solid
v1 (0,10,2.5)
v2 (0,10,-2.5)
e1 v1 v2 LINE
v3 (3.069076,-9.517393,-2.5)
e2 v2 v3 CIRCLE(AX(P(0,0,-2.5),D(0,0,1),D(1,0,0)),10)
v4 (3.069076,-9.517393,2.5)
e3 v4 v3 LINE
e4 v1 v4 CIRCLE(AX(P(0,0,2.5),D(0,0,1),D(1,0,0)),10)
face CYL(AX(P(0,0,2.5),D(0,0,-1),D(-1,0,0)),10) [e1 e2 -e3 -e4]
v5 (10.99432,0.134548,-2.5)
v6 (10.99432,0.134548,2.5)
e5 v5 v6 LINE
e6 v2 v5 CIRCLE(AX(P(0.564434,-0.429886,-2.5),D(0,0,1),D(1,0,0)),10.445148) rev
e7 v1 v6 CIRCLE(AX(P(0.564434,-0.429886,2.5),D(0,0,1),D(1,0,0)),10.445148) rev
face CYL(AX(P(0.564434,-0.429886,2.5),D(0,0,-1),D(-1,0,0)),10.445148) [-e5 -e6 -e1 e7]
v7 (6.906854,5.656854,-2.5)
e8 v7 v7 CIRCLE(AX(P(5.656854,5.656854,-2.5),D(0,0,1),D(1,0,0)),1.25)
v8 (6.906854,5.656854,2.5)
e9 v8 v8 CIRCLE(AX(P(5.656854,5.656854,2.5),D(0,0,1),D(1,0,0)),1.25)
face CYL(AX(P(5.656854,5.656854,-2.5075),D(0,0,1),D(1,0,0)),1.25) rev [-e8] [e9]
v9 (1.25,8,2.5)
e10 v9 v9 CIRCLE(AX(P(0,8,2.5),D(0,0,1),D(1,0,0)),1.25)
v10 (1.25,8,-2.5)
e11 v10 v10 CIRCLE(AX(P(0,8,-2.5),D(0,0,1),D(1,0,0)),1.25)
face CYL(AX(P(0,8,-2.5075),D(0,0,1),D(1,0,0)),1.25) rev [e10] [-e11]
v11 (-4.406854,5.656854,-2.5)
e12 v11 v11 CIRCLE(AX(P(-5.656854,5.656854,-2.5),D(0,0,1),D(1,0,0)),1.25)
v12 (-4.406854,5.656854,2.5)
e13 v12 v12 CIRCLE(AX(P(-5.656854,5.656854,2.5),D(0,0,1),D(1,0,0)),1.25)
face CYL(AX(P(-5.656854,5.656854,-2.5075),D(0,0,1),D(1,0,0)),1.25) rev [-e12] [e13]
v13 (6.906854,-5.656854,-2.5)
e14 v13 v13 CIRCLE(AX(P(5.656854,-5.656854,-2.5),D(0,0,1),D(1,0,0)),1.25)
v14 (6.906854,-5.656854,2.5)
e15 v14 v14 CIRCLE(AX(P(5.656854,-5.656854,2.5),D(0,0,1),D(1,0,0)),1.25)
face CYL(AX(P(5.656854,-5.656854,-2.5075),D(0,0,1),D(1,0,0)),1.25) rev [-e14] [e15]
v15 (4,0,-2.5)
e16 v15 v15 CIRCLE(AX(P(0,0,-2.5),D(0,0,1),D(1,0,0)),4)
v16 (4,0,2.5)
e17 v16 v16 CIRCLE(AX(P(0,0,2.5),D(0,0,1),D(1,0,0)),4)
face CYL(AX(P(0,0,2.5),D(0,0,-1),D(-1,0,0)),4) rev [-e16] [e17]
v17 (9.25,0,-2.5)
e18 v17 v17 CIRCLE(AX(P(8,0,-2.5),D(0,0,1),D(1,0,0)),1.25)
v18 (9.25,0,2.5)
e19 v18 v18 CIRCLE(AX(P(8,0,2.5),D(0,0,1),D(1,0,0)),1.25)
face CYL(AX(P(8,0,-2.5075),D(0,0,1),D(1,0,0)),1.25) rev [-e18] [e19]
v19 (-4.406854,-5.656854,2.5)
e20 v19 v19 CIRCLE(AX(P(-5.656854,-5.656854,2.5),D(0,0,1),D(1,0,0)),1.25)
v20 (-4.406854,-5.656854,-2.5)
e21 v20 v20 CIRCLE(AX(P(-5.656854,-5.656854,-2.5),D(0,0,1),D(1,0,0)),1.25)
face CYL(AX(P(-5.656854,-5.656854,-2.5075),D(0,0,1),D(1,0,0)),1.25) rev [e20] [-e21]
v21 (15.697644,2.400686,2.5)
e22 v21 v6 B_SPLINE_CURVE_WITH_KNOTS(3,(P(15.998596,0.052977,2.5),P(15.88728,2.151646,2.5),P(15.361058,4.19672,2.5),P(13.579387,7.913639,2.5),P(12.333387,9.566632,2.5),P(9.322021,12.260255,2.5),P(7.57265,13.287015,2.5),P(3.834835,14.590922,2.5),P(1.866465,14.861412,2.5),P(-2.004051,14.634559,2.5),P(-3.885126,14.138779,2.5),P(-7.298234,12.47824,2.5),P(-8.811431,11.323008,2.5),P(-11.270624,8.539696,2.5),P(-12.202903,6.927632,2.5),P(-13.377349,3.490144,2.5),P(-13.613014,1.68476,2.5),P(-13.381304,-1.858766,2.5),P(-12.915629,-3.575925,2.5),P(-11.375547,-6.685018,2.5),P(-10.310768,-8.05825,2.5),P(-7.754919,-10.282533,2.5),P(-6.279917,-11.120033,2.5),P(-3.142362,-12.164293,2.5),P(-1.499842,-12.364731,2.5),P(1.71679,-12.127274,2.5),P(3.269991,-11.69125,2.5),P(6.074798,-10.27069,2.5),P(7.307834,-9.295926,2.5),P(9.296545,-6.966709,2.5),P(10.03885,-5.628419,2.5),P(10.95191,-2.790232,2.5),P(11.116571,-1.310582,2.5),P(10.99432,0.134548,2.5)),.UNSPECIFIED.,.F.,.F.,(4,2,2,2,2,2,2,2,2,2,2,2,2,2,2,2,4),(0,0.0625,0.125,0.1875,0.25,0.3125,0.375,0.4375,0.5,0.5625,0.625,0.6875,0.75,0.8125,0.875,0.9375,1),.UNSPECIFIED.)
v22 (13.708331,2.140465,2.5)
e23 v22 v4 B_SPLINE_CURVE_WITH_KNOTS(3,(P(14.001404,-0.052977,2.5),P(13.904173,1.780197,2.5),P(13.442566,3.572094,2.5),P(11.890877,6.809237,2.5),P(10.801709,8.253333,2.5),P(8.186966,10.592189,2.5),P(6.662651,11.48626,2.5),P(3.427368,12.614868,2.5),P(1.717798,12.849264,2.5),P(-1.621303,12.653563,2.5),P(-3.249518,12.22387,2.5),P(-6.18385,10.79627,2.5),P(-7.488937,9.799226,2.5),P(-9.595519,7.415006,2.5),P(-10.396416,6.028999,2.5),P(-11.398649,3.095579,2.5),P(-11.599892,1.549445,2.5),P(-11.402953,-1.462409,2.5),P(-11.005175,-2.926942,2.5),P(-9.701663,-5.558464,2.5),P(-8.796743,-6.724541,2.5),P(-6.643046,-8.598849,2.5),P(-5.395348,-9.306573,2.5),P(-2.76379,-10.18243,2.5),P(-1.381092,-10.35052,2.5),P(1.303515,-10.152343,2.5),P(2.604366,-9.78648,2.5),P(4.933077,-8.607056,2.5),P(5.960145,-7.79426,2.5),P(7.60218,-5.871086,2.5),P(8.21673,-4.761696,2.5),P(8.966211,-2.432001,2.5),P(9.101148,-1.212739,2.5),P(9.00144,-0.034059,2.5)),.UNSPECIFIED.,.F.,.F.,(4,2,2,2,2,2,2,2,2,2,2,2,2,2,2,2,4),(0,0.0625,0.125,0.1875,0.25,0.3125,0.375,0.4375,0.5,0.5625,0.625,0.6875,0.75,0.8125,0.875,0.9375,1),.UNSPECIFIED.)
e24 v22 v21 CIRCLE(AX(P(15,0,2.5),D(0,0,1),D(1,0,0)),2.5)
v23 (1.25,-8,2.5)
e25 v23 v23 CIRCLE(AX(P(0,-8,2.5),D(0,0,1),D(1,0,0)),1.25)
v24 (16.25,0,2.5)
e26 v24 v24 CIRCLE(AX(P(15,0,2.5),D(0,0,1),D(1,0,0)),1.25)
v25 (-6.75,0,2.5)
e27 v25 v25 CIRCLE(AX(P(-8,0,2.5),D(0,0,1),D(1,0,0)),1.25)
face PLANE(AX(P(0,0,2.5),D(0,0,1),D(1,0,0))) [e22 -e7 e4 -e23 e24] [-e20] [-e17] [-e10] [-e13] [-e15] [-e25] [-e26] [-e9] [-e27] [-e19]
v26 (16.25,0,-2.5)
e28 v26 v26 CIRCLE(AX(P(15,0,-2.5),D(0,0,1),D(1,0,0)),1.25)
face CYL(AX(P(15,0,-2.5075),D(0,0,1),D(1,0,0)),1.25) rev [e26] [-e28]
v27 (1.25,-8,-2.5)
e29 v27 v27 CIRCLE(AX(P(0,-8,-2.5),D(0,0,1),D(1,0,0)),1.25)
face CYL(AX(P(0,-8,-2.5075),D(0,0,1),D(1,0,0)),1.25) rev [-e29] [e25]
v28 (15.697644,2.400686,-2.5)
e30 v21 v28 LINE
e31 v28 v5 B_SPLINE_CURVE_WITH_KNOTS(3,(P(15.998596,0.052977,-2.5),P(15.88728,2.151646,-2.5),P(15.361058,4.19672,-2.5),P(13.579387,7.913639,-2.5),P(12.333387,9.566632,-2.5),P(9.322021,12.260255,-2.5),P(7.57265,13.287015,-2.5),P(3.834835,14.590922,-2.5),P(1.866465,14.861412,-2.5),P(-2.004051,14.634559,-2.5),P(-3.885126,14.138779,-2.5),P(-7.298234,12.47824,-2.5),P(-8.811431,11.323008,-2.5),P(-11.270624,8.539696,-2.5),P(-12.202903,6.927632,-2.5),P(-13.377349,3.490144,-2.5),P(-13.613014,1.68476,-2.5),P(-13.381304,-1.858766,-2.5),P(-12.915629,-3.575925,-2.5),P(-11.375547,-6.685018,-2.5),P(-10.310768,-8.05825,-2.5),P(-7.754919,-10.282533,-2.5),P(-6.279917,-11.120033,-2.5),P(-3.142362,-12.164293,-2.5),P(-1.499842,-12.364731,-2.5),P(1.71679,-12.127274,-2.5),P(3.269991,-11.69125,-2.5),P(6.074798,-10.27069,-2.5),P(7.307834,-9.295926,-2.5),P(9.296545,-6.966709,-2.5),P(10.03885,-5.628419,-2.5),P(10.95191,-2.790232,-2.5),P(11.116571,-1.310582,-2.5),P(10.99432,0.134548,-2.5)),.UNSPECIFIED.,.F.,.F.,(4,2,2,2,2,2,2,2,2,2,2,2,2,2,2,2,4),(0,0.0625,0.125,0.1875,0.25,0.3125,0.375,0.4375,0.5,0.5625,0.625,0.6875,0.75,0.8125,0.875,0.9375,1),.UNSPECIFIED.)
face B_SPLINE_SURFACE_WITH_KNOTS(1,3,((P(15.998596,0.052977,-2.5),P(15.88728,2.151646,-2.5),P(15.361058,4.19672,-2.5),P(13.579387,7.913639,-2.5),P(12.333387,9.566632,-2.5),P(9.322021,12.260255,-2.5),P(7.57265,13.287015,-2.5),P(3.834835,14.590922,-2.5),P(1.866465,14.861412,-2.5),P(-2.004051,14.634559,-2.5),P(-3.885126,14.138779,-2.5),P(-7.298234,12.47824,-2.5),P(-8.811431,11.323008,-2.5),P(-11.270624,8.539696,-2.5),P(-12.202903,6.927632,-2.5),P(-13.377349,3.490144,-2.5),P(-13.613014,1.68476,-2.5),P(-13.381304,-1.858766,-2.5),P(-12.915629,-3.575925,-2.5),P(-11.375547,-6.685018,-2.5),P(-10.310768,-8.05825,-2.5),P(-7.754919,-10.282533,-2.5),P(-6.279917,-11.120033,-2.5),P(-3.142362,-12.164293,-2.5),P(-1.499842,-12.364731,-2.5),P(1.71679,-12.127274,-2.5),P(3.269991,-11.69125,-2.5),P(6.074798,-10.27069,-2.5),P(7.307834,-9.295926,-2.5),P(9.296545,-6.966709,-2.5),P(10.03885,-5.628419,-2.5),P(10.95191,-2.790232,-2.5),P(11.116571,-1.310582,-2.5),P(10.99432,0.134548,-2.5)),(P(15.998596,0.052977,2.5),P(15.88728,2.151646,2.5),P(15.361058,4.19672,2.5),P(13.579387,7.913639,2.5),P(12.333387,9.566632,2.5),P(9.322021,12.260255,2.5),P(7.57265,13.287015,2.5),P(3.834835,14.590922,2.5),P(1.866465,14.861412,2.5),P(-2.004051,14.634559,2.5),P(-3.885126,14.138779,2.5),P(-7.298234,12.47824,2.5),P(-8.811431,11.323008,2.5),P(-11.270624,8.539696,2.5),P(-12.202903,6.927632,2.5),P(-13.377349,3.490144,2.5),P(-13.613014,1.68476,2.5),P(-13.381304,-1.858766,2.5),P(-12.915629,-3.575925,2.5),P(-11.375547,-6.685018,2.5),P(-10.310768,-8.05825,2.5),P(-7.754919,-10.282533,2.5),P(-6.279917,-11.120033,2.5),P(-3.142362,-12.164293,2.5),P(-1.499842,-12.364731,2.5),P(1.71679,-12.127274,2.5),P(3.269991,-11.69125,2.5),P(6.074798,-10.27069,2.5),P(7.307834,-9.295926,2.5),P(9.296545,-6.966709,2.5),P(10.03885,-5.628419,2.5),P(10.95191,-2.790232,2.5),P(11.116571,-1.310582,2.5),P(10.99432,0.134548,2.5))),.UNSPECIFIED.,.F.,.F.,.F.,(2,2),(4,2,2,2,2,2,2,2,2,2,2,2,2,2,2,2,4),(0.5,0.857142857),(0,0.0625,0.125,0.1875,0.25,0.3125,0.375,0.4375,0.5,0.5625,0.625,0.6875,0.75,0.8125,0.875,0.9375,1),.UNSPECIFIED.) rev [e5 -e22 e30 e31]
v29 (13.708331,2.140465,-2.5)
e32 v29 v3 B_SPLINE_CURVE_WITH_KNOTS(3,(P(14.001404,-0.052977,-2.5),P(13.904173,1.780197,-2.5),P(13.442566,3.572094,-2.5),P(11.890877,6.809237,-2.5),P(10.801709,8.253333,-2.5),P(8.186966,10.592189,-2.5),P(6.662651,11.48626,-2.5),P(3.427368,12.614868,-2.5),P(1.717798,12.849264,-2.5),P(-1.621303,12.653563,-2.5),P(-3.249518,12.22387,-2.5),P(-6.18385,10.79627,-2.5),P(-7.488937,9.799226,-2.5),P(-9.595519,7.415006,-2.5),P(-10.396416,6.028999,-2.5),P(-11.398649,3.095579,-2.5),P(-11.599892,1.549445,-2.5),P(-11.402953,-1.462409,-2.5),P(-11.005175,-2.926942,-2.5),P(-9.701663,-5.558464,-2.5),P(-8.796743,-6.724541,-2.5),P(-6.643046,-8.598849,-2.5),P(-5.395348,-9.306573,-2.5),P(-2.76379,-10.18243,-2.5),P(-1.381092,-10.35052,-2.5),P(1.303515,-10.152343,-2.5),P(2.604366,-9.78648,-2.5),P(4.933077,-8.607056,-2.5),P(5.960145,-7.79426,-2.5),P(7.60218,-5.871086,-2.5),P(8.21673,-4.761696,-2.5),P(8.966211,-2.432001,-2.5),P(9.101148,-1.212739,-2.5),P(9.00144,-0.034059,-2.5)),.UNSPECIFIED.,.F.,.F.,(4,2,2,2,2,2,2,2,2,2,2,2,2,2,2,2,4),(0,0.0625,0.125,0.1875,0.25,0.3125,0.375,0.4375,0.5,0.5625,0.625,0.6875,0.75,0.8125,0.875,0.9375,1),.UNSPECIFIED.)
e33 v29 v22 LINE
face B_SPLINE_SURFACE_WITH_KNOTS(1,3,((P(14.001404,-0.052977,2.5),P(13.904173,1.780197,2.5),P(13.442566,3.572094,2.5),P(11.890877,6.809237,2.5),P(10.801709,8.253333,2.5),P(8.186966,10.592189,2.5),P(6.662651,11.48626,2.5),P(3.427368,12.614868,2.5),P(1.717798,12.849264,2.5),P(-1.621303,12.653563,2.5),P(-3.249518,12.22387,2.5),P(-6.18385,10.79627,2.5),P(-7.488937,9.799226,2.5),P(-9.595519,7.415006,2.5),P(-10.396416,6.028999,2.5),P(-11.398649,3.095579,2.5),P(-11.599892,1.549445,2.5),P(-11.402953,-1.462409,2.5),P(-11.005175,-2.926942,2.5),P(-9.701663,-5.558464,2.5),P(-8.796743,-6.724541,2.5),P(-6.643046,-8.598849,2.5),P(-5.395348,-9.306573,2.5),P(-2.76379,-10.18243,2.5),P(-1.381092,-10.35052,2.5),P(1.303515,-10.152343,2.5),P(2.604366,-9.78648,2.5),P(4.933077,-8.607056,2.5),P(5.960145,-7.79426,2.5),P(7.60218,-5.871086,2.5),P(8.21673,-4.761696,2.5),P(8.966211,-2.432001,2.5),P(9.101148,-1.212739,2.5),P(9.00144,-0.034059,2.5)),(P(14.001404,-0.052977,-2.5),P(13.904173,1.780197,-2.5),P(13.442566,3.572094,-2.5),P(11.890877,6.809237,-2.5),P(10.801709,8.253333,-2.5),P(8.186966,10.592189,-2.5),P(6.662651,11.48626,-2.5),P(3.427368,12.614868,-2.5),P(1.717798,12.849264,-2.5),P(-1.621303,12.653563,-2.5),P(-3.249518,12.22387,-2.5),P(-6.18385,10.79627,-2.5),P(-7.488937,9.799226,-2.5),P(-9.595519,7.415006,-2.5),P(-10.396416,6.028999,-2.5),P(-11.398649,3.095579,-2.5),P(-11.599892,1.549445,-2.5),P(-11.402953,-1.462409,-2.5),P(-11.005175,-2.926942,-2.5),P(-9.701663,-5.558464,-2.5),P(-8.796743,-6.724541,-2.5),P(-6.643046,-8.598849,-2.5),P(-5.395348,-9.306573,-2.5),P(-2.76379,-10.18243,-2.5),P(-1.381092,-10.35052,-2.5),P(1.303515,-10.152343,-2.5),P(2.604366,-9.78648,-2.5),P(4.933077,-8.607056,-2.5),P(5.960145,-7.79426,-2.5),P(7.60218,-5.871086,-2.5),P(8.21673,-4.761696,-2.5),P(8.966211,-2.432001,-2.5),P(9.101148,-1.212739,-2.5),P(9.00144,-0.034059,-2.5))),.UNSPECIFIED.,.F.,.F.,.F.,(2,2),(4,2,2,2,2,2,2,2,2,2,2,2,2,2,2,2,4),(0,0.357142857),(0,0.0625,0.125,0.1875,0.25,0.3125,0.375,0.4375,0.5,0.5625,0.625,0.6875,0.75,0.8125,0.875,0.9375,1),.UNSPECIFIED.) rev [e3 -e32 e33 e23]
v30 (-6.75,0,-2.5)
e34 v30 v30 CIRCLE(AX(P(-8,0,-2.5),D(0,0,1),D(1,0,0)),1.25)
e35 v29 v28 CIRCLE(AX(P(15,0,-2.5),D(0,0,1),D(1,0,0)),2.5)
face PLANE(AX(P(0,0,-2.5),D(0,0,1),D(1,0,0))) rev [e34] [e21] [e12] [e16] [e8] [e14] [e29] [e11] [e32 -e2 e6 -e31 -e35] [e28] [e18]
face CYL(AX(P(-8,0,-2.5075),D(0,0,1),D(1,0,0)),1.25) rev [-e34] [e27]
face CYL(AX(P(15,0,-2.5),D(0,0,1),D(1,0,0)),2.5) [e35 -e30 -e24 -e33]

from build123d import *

# Parameters (mm, degrees)
SKETCH1_R           = 10
SKETCH1_R_2         = 4
BOSS_EXTRUDE1_DEPTH = 2.5
SWEEP3_START        = -2.5
SWEEP3_DEPTH        = 5
BOSS_EXTRUDE4_DEPTH = 2.5
SKETCH16_R          = 1.25
CUT_EXTRUDE3_DEPTH  = 23.342791991
SKETCH17_R          = 2.5
BOSS_EXTRUDE6_DEPTH = 5
SKETCH19_R          = 1.25
CUT_EXTRUDE8_DEPTH  = 24.441315856


# Read off the part's stored shape, not the designer's step: Sweep3
with BuildPart() as part:
    # Sketch1 → Boss-Extrude1 (new, symmetric)
    with BuildSketch(Plane.XY):
        Circle(SKETCH1_R)
        Circle(SKETCH1_R_2, mode=Mode.SUBTRACT)
    extrude(amount=BOSS_EXTRUDE1_DEPTH, both=True)

    # Sweep3 outline → Sweep3 (add)
    with BuildSketch(Plane.XY.offset(SWEEP3_START)):
        with BuildLine():
            add(Edge.make_bspline(
                [(14.001404275, -0.052977149), (13.904173046, 1.780196521), (13.442565587, 3.572094196), (11.890877496, 6.809237043), (10.801709204, 8.253332904), (8.186966139, 10.592189091), (6.662651316, 11.486259684), (3.42736792, 12.614868217), (1.717797642, 12.849263513), (-1.621302533, 12.653562932), (-3.249518177, 12.223870491), (-6.183850481, 10.796270419), (-7.4889371, 9.799226246), (-9.595519252, 7.415006141), (-10.396416427, 6.02899944), (-11.398649051, 3.095578912), (-11.599891559, 1.549444602), (-11.402952782, -1.462408682), (-11.005175395, -2.926942158), (-9.701663343, -5.558463918), (-8.796743288, -6.724541295), (-6.643046144, -8.598849415), (-5.395347563, -9.306573168), (-2.763789906, -10.182429886), (-1.381091561, -10.350519603), (1.040427327, -10.171763686), (2.092847662, -9.919648115), (3.069076076, -9.517393133)],
                knots=[0, 0, 0, 0, 0.0625, 0.0625, 0.125, 0.125, 0.1875, 0.1875, 0.25, 0.25, 0.3125, 0.3125, 0.375, 0.375, 0.4375, 0.4375, 0.5, 0.5, 0.5625, 0.5625, 0.625, 0.625, 0.6875, 0.6875, 0.75, 0.75, 0.800250183, 0.800250183, 0.800250183, 0.800250183], degree=3))
            Line((14.001404275, -0.052977149), (15.998595725, 0.052977149))
            add(Edge.make_bspline(
                [(15.998595725, 0.052977149), (15.88727955, 2.151645773), (15.36105771, 4.196719949), (13.579387134, 7.913639429), (12.333386913, 9.566632433), (9.322020572, 12.260254967), (7.572650194, 13.287014766), (3.834835276, 14.590921671), (1.866465145, 14.861411913), (-2.004050658, 14.634559441), (-3.885126209, 14.138778854), (-7.298234063, 12.478239779), (-8.811431318, 11.323008142), (-11.270624066, 8.53969551), (-12.20290338, 6.927631835), (-13.377349106, 3.490143837), (-13.613013712, 1.684760102), (-13.381303715, -1.858765561), (-12.915628556, -3.575924925), (-11.375546669, -6.685018237), (-10.310768446, -8.058250389), (-7.754919009, -10.282533165), (-6.279916503, -11.120032821), (-3.142361815, -12.164293038), (-1.499841744, -12.364730806), (1.716789854, -12.127273583), (3.269990524, -11.691249995), (6.074797859, -10.270690198), (7.307834097, -9.295925842), (9.296545299, -6.96670873), (10.038849739, -5.628419319), (10.951909815, -2.790232385), (11.116570858, -1.310582106), (10.994320343, 0.134547868)],
                knots=[0, 0, 0, 0, 0.0625, 0.0625, 0.125, 0.125, 0.1875, 0.1875, 0.25, 0.25, 0.3125, 0.3125, 0.375, 0.375, 0.4375, 0.4375, 0.5, 0.5, 0.5625, 0.5625, 0.625, 0.625, 0.6875, 0.6875, 0.75, 0.75, 0.8125, 0.8125, 0.875, 0.875, 0.9375, 0.9375, 1, 1, 1, 1], degree=3))
            Line((10.994320343, 0.134547868), (9.999872925, 0.050413141))
            ThreePointArc((9.999872925, 0.050413141), (8.098461966, -5.866422571), (3.069076076, -9.517393133))
        make_face()
    extrude(amount=SWEEP3_DEPTH)

    # Sketch14 → Boss-Extrude4 (add, symmetric)
    with BuildSketch(Plane.XY):
        with BuildLine():
            ThreePointArc((0, 10), (7.540362208, 7.344272232), (10.994320343, 0.134547868))
            Line((10.994320343, 0.134547868), (9.999872925, 0.050413141))
            ThreePointArc((9.999872925, 0.050413141), (7.053221554, 7.088869142), (0, 10))
        make_face()
    extrude(amount=BOSS_EXTRUDE4_DEPTH, both=True)

    # Sketch16 → Cut-Extrude3 (cut, through all)
    with BuildSketch(Plane.XY.offset(2.5)):
        with Locations((8, 0)):
            Circle(SKETCH16_R)
        with Locations((5.656854249, -5.656854249)):
            Circle(SKETCH16_R)
        with Locations((0, -8)):
            Circle(SKETCH16_R)
        with Locations((-5.656854249, -5.656854249)):
            Circle(SKETCH16_R)
        with Locations((-8, 0)):
            Circle(SKETCH16_R)
        with Locations((-5.656854249, 5.656854249)):
            Circle(SKETCH16_R)
        with Locations((0, 8)):
            Circle(SKETCH16_R)
        with Locations((5.656854249, 5.656854249)):
            Circle(SKETCH16_R)
    extrude(amount=-CUT_EXTRUDE3_DEPTH, mode=Mode.SUBTRACT)

    # Sketch17 → Boss-Extrude6 (add)
    with BuildSketch(Plane.XY.offset(2.5)):
        with Locations((15, 0)):
            Circle(SKETCH17_R)
    extrude(amount=-BOSS_EXTRUDE6_DEPTH)

    # Sketch19 → Cut-Extrude8 (cut, through all)
    with BuildSketch(Plane.XY.offset(2.5)):
        with Locations((15, 0)):
            Circle(SKETCH19_R)
    extrude(amount=-CUT_EXTRUDE8_DEPTH, mode=Mode.SUBTRACT)


solid = part.part
